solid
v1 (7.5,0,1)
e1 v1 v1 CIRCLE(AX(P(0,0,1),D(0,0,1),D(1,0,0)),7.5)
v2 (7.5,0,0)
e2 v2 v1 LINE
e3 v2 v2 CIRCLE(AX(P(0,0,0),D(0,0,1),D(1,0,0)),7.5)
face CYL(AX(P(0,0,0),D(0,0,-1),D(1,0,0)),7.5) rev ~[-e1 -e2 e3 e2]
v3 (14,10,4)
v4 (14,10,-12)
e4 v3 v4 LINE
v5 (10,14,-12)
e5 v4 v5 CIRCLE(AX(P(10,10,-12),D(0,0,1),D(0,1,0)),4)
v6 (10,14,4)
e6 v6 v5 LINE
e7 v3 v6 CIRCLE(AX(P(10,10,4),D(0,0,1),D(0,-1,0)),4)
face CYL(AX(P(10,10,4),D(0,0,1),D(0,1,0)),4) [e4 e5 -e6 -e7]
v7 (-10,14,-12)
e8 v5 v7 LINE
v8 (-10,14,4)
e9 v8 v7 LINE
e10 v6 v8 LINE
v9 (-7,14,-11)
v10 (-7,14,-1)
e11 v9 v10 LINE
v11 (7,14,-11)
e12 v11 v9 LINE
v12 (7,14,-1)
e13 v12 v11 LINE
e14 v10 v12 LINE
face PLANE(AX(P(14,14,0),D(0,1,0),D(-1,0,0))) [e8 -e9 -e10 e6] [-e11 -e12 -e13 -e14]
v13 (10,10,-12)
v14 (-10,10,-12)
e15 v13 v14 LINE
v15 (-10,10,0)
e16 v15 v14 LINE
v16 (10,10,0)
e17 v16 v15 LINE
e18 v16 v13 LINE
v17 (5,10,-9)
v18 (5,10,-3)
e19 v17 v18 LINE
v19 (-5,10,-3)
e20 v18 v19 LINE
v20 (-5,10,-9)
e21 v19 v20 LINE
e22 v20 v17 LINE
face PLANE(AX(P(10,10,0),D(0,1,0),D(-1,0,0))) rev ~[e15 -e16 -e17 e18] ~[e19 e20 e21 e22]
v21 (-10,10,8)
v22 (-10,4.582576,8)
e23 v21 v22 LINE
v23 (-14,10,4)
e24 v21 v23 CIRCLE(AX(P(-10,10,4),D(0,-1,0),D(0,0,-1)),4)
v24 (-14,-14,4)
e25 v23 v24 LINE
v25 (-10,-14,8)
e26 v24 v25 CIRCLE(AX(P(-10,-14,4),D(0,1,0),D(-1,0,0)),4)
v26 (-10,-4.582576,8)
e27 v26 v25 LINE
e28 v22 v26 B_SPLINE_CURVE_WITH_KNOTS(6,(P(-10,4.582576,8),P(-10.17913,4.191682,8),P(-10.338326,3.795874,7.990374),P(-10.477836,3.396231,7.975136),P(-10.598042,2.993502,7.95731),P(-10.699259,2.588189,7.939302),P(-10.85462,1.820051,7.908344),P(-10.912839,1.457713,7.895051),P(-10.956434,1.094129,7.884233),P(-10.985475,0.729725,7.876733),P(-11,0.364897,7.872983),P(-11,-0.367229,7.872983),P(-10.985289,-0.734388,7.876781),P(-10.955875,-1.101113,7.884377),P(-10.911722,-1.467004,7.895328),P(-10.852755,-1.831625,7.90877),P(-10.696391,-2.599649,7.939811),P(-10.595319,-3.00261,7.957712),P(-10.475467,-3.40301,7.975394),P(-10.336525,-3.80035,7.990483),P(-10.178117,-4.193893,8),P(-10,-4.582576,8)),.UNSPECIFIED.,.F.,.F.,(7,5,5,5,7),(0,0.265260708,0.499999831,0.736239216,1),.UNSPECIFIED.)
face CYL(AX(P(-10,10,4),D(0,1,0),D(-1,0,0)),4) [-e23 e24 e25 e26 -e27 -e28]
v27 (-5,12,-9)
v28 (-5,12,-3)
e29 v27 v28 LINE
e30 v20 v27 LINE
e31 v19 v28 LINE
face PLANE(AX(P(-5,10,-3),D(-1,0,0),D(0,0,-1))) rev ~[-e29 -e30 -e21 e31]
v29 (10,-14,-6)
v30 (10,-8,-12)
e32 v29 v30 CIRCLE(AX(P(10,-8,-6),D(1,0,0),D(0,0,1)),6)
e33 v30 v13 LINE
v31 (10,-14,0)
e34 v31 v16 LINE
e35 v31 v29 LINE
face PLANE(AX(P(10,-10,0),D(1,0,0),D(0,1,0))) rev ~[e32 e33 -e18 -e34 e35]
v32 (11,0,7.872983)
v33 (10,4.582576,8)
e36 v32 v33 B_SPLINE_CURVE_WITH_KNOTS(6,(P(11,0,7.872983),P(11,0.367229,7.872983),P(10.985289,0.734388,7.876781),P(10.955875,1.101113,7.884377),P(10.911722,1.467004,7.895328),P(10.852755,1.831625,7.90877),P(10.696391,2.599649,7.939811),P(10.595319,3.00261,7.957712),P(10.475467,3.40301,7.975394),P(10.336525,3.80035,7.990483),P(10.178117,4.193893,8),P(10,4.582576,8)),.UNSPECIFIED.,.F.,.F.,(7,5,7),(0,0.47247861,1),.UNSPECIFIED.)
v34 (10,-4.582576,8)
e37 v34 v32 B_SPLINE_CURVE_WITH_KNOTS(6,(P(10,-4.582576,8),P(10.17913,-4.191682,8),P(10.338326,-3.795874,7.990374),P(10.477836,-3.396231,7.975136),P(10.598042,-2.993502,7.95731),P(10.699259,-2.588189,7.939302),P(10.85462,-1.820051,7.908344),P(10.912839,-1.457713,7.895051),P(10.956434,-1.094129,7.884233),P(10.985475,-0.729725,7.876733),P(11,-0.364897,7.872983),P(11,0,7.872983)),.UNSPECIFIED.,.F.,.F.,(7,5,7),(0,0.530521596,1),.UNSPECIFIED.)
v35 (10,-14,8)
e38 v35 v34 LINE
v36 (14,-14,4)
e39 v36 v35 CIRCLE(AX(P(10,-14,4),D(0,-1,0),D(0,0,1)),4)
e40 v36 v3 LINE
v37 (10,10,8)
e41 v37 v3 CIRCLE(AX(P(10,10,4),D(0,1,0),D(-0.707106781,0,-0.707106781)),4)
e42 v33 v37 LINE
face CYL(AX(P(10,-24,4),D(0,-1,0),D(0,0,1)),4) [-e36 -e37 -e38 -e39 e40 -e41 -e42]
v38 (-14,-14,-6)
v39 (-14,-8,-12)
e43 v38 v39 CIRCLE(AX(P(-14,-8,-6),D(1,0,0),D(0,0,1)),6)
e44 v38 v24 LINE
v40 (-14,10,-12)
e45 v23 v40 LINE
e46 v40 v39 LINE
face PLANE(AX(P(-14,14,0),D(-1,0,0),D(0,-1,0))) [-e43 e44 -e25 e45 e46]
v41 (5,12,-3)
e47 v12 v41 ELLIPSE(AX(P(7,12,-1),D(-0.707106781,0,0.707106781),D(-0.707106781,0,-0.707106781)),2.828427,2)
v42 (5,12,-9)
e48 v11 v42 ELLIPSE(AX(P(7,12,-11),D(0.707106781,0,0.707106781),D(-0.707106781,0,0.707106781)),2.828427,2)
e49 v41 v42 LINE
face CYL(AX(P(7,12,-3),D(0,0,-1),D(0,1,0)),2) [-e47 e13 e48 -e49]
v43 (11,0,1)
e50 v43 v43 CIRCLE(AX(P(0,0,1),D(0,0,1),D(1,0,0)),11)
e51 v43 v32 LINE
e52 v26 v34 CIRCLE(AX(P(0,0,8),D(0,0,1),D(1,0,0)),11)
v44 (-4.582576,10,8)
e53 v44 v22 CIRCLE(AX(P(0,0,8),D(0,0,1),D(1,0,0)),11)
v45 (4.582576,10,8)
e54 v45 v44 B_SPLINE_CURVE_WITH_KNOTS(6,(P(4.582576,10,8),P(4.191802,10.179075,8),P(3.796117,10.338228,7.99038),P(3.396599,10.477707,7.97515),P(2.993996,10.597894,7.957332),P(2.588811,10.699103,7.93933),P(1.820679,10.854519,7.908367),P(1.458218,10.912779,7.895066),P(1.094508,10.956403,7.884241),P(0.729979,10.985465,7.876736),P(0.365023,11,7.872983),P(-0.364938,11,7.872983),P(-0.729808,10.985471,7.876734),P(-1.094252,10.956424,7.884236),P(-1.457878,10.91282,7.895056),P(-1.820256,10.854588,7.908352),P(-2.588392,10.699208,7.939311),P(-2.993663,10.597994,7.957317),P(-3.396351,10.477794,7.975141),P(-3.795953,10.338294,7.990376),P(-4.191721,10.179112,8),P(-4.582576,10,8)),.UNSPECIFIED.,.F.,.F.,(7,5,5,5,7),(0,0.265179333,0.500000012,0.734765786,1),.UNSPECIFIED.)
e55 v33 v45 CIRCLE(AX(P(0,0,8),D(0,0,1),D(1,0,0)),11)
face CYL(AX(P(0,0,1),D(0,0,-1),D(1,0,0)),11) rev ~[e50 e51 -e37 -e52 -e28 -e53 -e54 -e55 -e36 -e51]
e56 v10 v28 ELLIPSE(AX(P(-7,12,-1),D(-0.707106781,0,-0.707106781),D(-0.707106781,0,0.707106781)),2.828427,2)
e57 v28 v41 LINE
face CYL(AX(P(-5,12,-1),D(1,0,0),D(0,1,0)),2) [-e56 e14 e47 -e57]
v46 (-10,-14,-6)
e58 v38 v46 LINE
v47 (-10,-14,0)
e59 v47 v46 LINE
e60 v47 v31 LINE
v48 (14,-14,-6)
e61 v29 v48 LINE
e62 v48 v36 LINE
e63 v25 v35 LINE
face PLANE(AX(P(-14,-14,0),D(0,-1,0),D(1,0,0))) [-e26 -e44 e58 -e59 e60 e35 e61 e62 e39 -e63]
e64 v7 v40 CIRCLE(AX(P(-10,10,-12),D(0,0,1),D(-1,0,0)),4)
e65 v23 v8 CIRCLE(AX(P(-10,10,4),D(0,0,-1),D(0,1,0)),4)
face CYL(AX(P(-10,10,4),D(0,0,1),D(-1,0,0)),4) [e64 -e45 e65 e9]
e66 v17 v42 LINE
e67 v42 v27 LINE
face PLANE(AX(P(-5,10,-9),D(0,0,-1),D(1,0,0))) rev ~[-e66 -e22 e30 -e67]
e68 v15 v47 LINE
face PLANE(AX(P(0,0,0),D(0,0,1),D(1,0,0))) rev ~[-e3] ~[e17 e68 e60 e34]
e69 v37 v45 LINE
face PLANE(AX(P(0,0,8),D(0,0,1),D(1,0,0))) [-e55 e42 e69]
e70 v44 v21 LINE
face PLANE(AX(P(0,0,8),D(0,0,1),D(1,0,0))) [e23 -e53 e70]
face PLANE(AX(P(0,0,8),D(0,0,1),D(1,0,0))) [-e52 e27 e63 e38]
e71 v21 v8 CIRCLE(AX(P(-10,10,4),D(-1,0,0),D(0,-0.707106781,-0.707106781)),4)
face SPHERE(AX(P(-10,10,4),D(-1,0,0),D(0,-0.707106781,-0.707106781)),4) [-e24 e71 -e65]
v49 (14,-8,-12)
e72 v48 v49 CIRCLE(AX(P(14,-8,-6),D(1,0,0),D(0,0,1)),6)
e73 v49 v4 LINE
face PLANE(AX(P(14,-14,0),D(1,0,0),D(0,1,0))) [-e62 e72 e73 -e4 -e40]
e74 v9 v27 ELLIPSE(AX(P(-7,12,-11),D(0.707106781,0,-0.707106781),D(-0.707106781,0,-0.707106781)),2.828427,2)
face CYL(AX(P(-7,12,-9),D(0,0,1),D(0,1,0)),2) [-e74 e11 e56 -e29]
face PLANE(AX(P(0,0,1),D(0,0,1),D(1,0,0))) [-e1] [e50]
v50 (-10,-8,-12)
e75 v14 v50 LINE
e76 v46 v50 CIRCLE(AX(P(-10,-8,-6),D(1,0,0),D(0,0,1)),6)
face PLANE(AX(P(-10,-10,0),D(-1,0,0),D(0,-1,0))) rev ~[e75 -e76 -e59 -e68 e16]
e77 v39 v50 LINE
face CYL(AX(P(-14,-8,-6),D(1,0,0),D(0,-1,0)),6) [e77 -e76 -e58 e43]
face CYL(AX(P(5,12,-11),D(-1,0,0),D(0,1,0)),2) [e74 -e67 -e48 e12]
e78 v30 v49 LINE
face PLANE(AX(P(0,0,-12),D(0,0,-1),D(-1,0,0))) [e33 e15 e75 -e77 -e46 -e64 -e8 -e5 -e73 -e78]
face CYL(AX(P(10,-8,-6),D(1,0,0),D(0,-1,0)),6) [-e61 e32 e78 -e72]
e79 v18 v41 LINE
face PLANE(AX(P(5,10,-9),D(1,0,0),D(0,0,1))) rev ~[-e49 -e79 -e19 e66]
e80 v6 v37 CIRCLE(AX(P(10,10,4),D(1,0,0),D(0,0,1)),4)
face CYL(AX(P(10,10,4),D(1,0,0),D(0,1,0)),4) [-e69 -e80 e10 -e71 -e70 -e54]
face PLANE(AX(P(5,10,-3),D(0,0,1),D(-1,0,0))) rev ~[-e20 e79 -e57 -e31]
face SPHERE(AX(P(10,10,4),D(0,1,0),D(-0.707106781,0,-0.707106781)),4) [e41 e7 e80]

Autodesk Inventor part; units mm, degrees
ref_plane "YZ Plane" through (0, 0, 0) normal (1, 0, 0) x (0, 1, 0)
ref_plane "XZ Plane" through (0, 0, 0) normal (0, 1, 0) x (-1, 0, 0)
ref_plane "XY Plane" through (0, 0, 0) normal (0, 0, 1) x (1, 0, 0)
sketch "Sketch1" plane through (0, 0, 0) normal (0, 0, 1) x (1, 0, 0)
  circle A0 centre (0, 0) radius 7.5
  line L0 (-10, 10) -> (10, 10)
  line L1 (10, 10) -> (10, -10)
  line L2 (10, -10) -> (-10, -10)
  line L3 (-10, -10) -> (-10, 10)
  line L4 (-10, -10) -> (-14, -10)
  line L5 (-14, -10) -> (-14, 10)
  line L6 (-14, 10) -> (-10, 10)
  line L7 (-10, 10) -> (-10, -10)
  line L8 (10, -10) -> (14, -10)
  line L9 (14, -10) -> (14, 10)
  line L10 (14, 10) -> (10, 10)
  line L11 (10, 10) -> (10, -10)
  line L12 (14, 10) -> (-14, 10)
  line L13 (-14, 10) -> (-14, 14)
  line L14 (-14, 14) -> (14, 14)
  line L15 (14, 14) -> (14, 10)
  line L16 (14, -10) -> (-14, -10)
  line L17 (-14, -10) -> (-14, -14)
  line L18 (-14, -14) -> (14, -14)
  line L19 (14, -14) -> (14, -10)
  dimension "d0" = 15
  dimension "d1" = 20
  dimension "d2" = 20
  dimension "d3" = 4
  dimension "d4" = 4
  dimension "d5" = 4
  dimension "d9" = 4
extrude "Extrusion1" add sketch "Sketch1" along normal blind 1
sketch "Sketch2" plane through (0, 0, 1) normal (0, 0, 1) x (1, 0, 0)
  circle A0 centre (0, 0) radius 7.5 projected
  circle A1 centre (0, 0) radius 11
  line L0 (14, 14) -> (-14, 14) projected
  circle A2 centre (0, 0) radius 7.5 projected
  line L1 (-14, 14) -> (-14, -14) projected
  line L2 (-14, -14) -> (14, -14) projected
  line L3 (14, -14) -> (14, 14) projected
  dimension "d8" = 22
extrude "Extrusion2" add sketch "Sketch2" along normal blind 7 contours L3 L2 L1 L0
sketch "Sketch3" plane through (0, 0, 0) normal (0, 0, -1) x (-1, 0, 0)
  line L0 (14, 14) -> (14, -14) projected
  line L1 (-14, 14) -> (14, 14) projected
  line L2 (-14, -14) -> (-14, 14) projected
  line L3 (14, -14) -> (-14, -14) projected
  circle A0 centre (0, 0) radius 7.5 projected
  line L4 (10, 10) -> (10, -10)
  line L5 (10, -10) -> (-10, -10)
  line L6 (-10, -10) -> (-10, 10)
  line L7 (-10, 10) -> (10, 10)
  line L8 (-10, -10) -> (-10, -14)
  line L9 (10, -10) -> (10, -14)
  line L10 (14, -14) -> (-14, -14) projected
  dimension "d12" = 4
extrude "Extrusion3" add sketch "Sketch3" along normal blind 12 contours L0 L3 L9 L4 L7 L6 L8 L2 L1
fillet "Fillet1" radius 6 2 edges at (-12, -14, -12) (12, -14, -12)
fillet "Fillet2" radius 4 5 edges at (-14, 14, -2) (0, 14, 8) (14, 14, -2) (-14, 0, 8) (14, 0, 8)
sketch "Sketch4" plane through (-10, 10, 0) normal (0, -1, 0) x (1, 0, 0)
  line L0 (15, -3) -> (5, -3)
  line L1 (5, -3) -> (5, -9)
  line L2 (5, -9) -> (15, -9)
  line L3 (15, -9) -> (15, -3)
  line L4 (0, 0) -> (20, 0) projected
  line L5 (20, -12) -> (20, -6) projected
  point P0 (10, 0)
  dimension "d17" = 10
  dimension "d18" = 6
  dimension "d19" = 3
  dimension "d20" = 5
extrude "Extrusion4" cut sketch "Sketch4" against normal blind 10
fillet "Fillet3" radius 2 4 edges at (0, 14, -9) (-5, 14, -6) (5, 14, -6) (0, 14, -3)
properties part number "mocowanie lozyska 10-2"
